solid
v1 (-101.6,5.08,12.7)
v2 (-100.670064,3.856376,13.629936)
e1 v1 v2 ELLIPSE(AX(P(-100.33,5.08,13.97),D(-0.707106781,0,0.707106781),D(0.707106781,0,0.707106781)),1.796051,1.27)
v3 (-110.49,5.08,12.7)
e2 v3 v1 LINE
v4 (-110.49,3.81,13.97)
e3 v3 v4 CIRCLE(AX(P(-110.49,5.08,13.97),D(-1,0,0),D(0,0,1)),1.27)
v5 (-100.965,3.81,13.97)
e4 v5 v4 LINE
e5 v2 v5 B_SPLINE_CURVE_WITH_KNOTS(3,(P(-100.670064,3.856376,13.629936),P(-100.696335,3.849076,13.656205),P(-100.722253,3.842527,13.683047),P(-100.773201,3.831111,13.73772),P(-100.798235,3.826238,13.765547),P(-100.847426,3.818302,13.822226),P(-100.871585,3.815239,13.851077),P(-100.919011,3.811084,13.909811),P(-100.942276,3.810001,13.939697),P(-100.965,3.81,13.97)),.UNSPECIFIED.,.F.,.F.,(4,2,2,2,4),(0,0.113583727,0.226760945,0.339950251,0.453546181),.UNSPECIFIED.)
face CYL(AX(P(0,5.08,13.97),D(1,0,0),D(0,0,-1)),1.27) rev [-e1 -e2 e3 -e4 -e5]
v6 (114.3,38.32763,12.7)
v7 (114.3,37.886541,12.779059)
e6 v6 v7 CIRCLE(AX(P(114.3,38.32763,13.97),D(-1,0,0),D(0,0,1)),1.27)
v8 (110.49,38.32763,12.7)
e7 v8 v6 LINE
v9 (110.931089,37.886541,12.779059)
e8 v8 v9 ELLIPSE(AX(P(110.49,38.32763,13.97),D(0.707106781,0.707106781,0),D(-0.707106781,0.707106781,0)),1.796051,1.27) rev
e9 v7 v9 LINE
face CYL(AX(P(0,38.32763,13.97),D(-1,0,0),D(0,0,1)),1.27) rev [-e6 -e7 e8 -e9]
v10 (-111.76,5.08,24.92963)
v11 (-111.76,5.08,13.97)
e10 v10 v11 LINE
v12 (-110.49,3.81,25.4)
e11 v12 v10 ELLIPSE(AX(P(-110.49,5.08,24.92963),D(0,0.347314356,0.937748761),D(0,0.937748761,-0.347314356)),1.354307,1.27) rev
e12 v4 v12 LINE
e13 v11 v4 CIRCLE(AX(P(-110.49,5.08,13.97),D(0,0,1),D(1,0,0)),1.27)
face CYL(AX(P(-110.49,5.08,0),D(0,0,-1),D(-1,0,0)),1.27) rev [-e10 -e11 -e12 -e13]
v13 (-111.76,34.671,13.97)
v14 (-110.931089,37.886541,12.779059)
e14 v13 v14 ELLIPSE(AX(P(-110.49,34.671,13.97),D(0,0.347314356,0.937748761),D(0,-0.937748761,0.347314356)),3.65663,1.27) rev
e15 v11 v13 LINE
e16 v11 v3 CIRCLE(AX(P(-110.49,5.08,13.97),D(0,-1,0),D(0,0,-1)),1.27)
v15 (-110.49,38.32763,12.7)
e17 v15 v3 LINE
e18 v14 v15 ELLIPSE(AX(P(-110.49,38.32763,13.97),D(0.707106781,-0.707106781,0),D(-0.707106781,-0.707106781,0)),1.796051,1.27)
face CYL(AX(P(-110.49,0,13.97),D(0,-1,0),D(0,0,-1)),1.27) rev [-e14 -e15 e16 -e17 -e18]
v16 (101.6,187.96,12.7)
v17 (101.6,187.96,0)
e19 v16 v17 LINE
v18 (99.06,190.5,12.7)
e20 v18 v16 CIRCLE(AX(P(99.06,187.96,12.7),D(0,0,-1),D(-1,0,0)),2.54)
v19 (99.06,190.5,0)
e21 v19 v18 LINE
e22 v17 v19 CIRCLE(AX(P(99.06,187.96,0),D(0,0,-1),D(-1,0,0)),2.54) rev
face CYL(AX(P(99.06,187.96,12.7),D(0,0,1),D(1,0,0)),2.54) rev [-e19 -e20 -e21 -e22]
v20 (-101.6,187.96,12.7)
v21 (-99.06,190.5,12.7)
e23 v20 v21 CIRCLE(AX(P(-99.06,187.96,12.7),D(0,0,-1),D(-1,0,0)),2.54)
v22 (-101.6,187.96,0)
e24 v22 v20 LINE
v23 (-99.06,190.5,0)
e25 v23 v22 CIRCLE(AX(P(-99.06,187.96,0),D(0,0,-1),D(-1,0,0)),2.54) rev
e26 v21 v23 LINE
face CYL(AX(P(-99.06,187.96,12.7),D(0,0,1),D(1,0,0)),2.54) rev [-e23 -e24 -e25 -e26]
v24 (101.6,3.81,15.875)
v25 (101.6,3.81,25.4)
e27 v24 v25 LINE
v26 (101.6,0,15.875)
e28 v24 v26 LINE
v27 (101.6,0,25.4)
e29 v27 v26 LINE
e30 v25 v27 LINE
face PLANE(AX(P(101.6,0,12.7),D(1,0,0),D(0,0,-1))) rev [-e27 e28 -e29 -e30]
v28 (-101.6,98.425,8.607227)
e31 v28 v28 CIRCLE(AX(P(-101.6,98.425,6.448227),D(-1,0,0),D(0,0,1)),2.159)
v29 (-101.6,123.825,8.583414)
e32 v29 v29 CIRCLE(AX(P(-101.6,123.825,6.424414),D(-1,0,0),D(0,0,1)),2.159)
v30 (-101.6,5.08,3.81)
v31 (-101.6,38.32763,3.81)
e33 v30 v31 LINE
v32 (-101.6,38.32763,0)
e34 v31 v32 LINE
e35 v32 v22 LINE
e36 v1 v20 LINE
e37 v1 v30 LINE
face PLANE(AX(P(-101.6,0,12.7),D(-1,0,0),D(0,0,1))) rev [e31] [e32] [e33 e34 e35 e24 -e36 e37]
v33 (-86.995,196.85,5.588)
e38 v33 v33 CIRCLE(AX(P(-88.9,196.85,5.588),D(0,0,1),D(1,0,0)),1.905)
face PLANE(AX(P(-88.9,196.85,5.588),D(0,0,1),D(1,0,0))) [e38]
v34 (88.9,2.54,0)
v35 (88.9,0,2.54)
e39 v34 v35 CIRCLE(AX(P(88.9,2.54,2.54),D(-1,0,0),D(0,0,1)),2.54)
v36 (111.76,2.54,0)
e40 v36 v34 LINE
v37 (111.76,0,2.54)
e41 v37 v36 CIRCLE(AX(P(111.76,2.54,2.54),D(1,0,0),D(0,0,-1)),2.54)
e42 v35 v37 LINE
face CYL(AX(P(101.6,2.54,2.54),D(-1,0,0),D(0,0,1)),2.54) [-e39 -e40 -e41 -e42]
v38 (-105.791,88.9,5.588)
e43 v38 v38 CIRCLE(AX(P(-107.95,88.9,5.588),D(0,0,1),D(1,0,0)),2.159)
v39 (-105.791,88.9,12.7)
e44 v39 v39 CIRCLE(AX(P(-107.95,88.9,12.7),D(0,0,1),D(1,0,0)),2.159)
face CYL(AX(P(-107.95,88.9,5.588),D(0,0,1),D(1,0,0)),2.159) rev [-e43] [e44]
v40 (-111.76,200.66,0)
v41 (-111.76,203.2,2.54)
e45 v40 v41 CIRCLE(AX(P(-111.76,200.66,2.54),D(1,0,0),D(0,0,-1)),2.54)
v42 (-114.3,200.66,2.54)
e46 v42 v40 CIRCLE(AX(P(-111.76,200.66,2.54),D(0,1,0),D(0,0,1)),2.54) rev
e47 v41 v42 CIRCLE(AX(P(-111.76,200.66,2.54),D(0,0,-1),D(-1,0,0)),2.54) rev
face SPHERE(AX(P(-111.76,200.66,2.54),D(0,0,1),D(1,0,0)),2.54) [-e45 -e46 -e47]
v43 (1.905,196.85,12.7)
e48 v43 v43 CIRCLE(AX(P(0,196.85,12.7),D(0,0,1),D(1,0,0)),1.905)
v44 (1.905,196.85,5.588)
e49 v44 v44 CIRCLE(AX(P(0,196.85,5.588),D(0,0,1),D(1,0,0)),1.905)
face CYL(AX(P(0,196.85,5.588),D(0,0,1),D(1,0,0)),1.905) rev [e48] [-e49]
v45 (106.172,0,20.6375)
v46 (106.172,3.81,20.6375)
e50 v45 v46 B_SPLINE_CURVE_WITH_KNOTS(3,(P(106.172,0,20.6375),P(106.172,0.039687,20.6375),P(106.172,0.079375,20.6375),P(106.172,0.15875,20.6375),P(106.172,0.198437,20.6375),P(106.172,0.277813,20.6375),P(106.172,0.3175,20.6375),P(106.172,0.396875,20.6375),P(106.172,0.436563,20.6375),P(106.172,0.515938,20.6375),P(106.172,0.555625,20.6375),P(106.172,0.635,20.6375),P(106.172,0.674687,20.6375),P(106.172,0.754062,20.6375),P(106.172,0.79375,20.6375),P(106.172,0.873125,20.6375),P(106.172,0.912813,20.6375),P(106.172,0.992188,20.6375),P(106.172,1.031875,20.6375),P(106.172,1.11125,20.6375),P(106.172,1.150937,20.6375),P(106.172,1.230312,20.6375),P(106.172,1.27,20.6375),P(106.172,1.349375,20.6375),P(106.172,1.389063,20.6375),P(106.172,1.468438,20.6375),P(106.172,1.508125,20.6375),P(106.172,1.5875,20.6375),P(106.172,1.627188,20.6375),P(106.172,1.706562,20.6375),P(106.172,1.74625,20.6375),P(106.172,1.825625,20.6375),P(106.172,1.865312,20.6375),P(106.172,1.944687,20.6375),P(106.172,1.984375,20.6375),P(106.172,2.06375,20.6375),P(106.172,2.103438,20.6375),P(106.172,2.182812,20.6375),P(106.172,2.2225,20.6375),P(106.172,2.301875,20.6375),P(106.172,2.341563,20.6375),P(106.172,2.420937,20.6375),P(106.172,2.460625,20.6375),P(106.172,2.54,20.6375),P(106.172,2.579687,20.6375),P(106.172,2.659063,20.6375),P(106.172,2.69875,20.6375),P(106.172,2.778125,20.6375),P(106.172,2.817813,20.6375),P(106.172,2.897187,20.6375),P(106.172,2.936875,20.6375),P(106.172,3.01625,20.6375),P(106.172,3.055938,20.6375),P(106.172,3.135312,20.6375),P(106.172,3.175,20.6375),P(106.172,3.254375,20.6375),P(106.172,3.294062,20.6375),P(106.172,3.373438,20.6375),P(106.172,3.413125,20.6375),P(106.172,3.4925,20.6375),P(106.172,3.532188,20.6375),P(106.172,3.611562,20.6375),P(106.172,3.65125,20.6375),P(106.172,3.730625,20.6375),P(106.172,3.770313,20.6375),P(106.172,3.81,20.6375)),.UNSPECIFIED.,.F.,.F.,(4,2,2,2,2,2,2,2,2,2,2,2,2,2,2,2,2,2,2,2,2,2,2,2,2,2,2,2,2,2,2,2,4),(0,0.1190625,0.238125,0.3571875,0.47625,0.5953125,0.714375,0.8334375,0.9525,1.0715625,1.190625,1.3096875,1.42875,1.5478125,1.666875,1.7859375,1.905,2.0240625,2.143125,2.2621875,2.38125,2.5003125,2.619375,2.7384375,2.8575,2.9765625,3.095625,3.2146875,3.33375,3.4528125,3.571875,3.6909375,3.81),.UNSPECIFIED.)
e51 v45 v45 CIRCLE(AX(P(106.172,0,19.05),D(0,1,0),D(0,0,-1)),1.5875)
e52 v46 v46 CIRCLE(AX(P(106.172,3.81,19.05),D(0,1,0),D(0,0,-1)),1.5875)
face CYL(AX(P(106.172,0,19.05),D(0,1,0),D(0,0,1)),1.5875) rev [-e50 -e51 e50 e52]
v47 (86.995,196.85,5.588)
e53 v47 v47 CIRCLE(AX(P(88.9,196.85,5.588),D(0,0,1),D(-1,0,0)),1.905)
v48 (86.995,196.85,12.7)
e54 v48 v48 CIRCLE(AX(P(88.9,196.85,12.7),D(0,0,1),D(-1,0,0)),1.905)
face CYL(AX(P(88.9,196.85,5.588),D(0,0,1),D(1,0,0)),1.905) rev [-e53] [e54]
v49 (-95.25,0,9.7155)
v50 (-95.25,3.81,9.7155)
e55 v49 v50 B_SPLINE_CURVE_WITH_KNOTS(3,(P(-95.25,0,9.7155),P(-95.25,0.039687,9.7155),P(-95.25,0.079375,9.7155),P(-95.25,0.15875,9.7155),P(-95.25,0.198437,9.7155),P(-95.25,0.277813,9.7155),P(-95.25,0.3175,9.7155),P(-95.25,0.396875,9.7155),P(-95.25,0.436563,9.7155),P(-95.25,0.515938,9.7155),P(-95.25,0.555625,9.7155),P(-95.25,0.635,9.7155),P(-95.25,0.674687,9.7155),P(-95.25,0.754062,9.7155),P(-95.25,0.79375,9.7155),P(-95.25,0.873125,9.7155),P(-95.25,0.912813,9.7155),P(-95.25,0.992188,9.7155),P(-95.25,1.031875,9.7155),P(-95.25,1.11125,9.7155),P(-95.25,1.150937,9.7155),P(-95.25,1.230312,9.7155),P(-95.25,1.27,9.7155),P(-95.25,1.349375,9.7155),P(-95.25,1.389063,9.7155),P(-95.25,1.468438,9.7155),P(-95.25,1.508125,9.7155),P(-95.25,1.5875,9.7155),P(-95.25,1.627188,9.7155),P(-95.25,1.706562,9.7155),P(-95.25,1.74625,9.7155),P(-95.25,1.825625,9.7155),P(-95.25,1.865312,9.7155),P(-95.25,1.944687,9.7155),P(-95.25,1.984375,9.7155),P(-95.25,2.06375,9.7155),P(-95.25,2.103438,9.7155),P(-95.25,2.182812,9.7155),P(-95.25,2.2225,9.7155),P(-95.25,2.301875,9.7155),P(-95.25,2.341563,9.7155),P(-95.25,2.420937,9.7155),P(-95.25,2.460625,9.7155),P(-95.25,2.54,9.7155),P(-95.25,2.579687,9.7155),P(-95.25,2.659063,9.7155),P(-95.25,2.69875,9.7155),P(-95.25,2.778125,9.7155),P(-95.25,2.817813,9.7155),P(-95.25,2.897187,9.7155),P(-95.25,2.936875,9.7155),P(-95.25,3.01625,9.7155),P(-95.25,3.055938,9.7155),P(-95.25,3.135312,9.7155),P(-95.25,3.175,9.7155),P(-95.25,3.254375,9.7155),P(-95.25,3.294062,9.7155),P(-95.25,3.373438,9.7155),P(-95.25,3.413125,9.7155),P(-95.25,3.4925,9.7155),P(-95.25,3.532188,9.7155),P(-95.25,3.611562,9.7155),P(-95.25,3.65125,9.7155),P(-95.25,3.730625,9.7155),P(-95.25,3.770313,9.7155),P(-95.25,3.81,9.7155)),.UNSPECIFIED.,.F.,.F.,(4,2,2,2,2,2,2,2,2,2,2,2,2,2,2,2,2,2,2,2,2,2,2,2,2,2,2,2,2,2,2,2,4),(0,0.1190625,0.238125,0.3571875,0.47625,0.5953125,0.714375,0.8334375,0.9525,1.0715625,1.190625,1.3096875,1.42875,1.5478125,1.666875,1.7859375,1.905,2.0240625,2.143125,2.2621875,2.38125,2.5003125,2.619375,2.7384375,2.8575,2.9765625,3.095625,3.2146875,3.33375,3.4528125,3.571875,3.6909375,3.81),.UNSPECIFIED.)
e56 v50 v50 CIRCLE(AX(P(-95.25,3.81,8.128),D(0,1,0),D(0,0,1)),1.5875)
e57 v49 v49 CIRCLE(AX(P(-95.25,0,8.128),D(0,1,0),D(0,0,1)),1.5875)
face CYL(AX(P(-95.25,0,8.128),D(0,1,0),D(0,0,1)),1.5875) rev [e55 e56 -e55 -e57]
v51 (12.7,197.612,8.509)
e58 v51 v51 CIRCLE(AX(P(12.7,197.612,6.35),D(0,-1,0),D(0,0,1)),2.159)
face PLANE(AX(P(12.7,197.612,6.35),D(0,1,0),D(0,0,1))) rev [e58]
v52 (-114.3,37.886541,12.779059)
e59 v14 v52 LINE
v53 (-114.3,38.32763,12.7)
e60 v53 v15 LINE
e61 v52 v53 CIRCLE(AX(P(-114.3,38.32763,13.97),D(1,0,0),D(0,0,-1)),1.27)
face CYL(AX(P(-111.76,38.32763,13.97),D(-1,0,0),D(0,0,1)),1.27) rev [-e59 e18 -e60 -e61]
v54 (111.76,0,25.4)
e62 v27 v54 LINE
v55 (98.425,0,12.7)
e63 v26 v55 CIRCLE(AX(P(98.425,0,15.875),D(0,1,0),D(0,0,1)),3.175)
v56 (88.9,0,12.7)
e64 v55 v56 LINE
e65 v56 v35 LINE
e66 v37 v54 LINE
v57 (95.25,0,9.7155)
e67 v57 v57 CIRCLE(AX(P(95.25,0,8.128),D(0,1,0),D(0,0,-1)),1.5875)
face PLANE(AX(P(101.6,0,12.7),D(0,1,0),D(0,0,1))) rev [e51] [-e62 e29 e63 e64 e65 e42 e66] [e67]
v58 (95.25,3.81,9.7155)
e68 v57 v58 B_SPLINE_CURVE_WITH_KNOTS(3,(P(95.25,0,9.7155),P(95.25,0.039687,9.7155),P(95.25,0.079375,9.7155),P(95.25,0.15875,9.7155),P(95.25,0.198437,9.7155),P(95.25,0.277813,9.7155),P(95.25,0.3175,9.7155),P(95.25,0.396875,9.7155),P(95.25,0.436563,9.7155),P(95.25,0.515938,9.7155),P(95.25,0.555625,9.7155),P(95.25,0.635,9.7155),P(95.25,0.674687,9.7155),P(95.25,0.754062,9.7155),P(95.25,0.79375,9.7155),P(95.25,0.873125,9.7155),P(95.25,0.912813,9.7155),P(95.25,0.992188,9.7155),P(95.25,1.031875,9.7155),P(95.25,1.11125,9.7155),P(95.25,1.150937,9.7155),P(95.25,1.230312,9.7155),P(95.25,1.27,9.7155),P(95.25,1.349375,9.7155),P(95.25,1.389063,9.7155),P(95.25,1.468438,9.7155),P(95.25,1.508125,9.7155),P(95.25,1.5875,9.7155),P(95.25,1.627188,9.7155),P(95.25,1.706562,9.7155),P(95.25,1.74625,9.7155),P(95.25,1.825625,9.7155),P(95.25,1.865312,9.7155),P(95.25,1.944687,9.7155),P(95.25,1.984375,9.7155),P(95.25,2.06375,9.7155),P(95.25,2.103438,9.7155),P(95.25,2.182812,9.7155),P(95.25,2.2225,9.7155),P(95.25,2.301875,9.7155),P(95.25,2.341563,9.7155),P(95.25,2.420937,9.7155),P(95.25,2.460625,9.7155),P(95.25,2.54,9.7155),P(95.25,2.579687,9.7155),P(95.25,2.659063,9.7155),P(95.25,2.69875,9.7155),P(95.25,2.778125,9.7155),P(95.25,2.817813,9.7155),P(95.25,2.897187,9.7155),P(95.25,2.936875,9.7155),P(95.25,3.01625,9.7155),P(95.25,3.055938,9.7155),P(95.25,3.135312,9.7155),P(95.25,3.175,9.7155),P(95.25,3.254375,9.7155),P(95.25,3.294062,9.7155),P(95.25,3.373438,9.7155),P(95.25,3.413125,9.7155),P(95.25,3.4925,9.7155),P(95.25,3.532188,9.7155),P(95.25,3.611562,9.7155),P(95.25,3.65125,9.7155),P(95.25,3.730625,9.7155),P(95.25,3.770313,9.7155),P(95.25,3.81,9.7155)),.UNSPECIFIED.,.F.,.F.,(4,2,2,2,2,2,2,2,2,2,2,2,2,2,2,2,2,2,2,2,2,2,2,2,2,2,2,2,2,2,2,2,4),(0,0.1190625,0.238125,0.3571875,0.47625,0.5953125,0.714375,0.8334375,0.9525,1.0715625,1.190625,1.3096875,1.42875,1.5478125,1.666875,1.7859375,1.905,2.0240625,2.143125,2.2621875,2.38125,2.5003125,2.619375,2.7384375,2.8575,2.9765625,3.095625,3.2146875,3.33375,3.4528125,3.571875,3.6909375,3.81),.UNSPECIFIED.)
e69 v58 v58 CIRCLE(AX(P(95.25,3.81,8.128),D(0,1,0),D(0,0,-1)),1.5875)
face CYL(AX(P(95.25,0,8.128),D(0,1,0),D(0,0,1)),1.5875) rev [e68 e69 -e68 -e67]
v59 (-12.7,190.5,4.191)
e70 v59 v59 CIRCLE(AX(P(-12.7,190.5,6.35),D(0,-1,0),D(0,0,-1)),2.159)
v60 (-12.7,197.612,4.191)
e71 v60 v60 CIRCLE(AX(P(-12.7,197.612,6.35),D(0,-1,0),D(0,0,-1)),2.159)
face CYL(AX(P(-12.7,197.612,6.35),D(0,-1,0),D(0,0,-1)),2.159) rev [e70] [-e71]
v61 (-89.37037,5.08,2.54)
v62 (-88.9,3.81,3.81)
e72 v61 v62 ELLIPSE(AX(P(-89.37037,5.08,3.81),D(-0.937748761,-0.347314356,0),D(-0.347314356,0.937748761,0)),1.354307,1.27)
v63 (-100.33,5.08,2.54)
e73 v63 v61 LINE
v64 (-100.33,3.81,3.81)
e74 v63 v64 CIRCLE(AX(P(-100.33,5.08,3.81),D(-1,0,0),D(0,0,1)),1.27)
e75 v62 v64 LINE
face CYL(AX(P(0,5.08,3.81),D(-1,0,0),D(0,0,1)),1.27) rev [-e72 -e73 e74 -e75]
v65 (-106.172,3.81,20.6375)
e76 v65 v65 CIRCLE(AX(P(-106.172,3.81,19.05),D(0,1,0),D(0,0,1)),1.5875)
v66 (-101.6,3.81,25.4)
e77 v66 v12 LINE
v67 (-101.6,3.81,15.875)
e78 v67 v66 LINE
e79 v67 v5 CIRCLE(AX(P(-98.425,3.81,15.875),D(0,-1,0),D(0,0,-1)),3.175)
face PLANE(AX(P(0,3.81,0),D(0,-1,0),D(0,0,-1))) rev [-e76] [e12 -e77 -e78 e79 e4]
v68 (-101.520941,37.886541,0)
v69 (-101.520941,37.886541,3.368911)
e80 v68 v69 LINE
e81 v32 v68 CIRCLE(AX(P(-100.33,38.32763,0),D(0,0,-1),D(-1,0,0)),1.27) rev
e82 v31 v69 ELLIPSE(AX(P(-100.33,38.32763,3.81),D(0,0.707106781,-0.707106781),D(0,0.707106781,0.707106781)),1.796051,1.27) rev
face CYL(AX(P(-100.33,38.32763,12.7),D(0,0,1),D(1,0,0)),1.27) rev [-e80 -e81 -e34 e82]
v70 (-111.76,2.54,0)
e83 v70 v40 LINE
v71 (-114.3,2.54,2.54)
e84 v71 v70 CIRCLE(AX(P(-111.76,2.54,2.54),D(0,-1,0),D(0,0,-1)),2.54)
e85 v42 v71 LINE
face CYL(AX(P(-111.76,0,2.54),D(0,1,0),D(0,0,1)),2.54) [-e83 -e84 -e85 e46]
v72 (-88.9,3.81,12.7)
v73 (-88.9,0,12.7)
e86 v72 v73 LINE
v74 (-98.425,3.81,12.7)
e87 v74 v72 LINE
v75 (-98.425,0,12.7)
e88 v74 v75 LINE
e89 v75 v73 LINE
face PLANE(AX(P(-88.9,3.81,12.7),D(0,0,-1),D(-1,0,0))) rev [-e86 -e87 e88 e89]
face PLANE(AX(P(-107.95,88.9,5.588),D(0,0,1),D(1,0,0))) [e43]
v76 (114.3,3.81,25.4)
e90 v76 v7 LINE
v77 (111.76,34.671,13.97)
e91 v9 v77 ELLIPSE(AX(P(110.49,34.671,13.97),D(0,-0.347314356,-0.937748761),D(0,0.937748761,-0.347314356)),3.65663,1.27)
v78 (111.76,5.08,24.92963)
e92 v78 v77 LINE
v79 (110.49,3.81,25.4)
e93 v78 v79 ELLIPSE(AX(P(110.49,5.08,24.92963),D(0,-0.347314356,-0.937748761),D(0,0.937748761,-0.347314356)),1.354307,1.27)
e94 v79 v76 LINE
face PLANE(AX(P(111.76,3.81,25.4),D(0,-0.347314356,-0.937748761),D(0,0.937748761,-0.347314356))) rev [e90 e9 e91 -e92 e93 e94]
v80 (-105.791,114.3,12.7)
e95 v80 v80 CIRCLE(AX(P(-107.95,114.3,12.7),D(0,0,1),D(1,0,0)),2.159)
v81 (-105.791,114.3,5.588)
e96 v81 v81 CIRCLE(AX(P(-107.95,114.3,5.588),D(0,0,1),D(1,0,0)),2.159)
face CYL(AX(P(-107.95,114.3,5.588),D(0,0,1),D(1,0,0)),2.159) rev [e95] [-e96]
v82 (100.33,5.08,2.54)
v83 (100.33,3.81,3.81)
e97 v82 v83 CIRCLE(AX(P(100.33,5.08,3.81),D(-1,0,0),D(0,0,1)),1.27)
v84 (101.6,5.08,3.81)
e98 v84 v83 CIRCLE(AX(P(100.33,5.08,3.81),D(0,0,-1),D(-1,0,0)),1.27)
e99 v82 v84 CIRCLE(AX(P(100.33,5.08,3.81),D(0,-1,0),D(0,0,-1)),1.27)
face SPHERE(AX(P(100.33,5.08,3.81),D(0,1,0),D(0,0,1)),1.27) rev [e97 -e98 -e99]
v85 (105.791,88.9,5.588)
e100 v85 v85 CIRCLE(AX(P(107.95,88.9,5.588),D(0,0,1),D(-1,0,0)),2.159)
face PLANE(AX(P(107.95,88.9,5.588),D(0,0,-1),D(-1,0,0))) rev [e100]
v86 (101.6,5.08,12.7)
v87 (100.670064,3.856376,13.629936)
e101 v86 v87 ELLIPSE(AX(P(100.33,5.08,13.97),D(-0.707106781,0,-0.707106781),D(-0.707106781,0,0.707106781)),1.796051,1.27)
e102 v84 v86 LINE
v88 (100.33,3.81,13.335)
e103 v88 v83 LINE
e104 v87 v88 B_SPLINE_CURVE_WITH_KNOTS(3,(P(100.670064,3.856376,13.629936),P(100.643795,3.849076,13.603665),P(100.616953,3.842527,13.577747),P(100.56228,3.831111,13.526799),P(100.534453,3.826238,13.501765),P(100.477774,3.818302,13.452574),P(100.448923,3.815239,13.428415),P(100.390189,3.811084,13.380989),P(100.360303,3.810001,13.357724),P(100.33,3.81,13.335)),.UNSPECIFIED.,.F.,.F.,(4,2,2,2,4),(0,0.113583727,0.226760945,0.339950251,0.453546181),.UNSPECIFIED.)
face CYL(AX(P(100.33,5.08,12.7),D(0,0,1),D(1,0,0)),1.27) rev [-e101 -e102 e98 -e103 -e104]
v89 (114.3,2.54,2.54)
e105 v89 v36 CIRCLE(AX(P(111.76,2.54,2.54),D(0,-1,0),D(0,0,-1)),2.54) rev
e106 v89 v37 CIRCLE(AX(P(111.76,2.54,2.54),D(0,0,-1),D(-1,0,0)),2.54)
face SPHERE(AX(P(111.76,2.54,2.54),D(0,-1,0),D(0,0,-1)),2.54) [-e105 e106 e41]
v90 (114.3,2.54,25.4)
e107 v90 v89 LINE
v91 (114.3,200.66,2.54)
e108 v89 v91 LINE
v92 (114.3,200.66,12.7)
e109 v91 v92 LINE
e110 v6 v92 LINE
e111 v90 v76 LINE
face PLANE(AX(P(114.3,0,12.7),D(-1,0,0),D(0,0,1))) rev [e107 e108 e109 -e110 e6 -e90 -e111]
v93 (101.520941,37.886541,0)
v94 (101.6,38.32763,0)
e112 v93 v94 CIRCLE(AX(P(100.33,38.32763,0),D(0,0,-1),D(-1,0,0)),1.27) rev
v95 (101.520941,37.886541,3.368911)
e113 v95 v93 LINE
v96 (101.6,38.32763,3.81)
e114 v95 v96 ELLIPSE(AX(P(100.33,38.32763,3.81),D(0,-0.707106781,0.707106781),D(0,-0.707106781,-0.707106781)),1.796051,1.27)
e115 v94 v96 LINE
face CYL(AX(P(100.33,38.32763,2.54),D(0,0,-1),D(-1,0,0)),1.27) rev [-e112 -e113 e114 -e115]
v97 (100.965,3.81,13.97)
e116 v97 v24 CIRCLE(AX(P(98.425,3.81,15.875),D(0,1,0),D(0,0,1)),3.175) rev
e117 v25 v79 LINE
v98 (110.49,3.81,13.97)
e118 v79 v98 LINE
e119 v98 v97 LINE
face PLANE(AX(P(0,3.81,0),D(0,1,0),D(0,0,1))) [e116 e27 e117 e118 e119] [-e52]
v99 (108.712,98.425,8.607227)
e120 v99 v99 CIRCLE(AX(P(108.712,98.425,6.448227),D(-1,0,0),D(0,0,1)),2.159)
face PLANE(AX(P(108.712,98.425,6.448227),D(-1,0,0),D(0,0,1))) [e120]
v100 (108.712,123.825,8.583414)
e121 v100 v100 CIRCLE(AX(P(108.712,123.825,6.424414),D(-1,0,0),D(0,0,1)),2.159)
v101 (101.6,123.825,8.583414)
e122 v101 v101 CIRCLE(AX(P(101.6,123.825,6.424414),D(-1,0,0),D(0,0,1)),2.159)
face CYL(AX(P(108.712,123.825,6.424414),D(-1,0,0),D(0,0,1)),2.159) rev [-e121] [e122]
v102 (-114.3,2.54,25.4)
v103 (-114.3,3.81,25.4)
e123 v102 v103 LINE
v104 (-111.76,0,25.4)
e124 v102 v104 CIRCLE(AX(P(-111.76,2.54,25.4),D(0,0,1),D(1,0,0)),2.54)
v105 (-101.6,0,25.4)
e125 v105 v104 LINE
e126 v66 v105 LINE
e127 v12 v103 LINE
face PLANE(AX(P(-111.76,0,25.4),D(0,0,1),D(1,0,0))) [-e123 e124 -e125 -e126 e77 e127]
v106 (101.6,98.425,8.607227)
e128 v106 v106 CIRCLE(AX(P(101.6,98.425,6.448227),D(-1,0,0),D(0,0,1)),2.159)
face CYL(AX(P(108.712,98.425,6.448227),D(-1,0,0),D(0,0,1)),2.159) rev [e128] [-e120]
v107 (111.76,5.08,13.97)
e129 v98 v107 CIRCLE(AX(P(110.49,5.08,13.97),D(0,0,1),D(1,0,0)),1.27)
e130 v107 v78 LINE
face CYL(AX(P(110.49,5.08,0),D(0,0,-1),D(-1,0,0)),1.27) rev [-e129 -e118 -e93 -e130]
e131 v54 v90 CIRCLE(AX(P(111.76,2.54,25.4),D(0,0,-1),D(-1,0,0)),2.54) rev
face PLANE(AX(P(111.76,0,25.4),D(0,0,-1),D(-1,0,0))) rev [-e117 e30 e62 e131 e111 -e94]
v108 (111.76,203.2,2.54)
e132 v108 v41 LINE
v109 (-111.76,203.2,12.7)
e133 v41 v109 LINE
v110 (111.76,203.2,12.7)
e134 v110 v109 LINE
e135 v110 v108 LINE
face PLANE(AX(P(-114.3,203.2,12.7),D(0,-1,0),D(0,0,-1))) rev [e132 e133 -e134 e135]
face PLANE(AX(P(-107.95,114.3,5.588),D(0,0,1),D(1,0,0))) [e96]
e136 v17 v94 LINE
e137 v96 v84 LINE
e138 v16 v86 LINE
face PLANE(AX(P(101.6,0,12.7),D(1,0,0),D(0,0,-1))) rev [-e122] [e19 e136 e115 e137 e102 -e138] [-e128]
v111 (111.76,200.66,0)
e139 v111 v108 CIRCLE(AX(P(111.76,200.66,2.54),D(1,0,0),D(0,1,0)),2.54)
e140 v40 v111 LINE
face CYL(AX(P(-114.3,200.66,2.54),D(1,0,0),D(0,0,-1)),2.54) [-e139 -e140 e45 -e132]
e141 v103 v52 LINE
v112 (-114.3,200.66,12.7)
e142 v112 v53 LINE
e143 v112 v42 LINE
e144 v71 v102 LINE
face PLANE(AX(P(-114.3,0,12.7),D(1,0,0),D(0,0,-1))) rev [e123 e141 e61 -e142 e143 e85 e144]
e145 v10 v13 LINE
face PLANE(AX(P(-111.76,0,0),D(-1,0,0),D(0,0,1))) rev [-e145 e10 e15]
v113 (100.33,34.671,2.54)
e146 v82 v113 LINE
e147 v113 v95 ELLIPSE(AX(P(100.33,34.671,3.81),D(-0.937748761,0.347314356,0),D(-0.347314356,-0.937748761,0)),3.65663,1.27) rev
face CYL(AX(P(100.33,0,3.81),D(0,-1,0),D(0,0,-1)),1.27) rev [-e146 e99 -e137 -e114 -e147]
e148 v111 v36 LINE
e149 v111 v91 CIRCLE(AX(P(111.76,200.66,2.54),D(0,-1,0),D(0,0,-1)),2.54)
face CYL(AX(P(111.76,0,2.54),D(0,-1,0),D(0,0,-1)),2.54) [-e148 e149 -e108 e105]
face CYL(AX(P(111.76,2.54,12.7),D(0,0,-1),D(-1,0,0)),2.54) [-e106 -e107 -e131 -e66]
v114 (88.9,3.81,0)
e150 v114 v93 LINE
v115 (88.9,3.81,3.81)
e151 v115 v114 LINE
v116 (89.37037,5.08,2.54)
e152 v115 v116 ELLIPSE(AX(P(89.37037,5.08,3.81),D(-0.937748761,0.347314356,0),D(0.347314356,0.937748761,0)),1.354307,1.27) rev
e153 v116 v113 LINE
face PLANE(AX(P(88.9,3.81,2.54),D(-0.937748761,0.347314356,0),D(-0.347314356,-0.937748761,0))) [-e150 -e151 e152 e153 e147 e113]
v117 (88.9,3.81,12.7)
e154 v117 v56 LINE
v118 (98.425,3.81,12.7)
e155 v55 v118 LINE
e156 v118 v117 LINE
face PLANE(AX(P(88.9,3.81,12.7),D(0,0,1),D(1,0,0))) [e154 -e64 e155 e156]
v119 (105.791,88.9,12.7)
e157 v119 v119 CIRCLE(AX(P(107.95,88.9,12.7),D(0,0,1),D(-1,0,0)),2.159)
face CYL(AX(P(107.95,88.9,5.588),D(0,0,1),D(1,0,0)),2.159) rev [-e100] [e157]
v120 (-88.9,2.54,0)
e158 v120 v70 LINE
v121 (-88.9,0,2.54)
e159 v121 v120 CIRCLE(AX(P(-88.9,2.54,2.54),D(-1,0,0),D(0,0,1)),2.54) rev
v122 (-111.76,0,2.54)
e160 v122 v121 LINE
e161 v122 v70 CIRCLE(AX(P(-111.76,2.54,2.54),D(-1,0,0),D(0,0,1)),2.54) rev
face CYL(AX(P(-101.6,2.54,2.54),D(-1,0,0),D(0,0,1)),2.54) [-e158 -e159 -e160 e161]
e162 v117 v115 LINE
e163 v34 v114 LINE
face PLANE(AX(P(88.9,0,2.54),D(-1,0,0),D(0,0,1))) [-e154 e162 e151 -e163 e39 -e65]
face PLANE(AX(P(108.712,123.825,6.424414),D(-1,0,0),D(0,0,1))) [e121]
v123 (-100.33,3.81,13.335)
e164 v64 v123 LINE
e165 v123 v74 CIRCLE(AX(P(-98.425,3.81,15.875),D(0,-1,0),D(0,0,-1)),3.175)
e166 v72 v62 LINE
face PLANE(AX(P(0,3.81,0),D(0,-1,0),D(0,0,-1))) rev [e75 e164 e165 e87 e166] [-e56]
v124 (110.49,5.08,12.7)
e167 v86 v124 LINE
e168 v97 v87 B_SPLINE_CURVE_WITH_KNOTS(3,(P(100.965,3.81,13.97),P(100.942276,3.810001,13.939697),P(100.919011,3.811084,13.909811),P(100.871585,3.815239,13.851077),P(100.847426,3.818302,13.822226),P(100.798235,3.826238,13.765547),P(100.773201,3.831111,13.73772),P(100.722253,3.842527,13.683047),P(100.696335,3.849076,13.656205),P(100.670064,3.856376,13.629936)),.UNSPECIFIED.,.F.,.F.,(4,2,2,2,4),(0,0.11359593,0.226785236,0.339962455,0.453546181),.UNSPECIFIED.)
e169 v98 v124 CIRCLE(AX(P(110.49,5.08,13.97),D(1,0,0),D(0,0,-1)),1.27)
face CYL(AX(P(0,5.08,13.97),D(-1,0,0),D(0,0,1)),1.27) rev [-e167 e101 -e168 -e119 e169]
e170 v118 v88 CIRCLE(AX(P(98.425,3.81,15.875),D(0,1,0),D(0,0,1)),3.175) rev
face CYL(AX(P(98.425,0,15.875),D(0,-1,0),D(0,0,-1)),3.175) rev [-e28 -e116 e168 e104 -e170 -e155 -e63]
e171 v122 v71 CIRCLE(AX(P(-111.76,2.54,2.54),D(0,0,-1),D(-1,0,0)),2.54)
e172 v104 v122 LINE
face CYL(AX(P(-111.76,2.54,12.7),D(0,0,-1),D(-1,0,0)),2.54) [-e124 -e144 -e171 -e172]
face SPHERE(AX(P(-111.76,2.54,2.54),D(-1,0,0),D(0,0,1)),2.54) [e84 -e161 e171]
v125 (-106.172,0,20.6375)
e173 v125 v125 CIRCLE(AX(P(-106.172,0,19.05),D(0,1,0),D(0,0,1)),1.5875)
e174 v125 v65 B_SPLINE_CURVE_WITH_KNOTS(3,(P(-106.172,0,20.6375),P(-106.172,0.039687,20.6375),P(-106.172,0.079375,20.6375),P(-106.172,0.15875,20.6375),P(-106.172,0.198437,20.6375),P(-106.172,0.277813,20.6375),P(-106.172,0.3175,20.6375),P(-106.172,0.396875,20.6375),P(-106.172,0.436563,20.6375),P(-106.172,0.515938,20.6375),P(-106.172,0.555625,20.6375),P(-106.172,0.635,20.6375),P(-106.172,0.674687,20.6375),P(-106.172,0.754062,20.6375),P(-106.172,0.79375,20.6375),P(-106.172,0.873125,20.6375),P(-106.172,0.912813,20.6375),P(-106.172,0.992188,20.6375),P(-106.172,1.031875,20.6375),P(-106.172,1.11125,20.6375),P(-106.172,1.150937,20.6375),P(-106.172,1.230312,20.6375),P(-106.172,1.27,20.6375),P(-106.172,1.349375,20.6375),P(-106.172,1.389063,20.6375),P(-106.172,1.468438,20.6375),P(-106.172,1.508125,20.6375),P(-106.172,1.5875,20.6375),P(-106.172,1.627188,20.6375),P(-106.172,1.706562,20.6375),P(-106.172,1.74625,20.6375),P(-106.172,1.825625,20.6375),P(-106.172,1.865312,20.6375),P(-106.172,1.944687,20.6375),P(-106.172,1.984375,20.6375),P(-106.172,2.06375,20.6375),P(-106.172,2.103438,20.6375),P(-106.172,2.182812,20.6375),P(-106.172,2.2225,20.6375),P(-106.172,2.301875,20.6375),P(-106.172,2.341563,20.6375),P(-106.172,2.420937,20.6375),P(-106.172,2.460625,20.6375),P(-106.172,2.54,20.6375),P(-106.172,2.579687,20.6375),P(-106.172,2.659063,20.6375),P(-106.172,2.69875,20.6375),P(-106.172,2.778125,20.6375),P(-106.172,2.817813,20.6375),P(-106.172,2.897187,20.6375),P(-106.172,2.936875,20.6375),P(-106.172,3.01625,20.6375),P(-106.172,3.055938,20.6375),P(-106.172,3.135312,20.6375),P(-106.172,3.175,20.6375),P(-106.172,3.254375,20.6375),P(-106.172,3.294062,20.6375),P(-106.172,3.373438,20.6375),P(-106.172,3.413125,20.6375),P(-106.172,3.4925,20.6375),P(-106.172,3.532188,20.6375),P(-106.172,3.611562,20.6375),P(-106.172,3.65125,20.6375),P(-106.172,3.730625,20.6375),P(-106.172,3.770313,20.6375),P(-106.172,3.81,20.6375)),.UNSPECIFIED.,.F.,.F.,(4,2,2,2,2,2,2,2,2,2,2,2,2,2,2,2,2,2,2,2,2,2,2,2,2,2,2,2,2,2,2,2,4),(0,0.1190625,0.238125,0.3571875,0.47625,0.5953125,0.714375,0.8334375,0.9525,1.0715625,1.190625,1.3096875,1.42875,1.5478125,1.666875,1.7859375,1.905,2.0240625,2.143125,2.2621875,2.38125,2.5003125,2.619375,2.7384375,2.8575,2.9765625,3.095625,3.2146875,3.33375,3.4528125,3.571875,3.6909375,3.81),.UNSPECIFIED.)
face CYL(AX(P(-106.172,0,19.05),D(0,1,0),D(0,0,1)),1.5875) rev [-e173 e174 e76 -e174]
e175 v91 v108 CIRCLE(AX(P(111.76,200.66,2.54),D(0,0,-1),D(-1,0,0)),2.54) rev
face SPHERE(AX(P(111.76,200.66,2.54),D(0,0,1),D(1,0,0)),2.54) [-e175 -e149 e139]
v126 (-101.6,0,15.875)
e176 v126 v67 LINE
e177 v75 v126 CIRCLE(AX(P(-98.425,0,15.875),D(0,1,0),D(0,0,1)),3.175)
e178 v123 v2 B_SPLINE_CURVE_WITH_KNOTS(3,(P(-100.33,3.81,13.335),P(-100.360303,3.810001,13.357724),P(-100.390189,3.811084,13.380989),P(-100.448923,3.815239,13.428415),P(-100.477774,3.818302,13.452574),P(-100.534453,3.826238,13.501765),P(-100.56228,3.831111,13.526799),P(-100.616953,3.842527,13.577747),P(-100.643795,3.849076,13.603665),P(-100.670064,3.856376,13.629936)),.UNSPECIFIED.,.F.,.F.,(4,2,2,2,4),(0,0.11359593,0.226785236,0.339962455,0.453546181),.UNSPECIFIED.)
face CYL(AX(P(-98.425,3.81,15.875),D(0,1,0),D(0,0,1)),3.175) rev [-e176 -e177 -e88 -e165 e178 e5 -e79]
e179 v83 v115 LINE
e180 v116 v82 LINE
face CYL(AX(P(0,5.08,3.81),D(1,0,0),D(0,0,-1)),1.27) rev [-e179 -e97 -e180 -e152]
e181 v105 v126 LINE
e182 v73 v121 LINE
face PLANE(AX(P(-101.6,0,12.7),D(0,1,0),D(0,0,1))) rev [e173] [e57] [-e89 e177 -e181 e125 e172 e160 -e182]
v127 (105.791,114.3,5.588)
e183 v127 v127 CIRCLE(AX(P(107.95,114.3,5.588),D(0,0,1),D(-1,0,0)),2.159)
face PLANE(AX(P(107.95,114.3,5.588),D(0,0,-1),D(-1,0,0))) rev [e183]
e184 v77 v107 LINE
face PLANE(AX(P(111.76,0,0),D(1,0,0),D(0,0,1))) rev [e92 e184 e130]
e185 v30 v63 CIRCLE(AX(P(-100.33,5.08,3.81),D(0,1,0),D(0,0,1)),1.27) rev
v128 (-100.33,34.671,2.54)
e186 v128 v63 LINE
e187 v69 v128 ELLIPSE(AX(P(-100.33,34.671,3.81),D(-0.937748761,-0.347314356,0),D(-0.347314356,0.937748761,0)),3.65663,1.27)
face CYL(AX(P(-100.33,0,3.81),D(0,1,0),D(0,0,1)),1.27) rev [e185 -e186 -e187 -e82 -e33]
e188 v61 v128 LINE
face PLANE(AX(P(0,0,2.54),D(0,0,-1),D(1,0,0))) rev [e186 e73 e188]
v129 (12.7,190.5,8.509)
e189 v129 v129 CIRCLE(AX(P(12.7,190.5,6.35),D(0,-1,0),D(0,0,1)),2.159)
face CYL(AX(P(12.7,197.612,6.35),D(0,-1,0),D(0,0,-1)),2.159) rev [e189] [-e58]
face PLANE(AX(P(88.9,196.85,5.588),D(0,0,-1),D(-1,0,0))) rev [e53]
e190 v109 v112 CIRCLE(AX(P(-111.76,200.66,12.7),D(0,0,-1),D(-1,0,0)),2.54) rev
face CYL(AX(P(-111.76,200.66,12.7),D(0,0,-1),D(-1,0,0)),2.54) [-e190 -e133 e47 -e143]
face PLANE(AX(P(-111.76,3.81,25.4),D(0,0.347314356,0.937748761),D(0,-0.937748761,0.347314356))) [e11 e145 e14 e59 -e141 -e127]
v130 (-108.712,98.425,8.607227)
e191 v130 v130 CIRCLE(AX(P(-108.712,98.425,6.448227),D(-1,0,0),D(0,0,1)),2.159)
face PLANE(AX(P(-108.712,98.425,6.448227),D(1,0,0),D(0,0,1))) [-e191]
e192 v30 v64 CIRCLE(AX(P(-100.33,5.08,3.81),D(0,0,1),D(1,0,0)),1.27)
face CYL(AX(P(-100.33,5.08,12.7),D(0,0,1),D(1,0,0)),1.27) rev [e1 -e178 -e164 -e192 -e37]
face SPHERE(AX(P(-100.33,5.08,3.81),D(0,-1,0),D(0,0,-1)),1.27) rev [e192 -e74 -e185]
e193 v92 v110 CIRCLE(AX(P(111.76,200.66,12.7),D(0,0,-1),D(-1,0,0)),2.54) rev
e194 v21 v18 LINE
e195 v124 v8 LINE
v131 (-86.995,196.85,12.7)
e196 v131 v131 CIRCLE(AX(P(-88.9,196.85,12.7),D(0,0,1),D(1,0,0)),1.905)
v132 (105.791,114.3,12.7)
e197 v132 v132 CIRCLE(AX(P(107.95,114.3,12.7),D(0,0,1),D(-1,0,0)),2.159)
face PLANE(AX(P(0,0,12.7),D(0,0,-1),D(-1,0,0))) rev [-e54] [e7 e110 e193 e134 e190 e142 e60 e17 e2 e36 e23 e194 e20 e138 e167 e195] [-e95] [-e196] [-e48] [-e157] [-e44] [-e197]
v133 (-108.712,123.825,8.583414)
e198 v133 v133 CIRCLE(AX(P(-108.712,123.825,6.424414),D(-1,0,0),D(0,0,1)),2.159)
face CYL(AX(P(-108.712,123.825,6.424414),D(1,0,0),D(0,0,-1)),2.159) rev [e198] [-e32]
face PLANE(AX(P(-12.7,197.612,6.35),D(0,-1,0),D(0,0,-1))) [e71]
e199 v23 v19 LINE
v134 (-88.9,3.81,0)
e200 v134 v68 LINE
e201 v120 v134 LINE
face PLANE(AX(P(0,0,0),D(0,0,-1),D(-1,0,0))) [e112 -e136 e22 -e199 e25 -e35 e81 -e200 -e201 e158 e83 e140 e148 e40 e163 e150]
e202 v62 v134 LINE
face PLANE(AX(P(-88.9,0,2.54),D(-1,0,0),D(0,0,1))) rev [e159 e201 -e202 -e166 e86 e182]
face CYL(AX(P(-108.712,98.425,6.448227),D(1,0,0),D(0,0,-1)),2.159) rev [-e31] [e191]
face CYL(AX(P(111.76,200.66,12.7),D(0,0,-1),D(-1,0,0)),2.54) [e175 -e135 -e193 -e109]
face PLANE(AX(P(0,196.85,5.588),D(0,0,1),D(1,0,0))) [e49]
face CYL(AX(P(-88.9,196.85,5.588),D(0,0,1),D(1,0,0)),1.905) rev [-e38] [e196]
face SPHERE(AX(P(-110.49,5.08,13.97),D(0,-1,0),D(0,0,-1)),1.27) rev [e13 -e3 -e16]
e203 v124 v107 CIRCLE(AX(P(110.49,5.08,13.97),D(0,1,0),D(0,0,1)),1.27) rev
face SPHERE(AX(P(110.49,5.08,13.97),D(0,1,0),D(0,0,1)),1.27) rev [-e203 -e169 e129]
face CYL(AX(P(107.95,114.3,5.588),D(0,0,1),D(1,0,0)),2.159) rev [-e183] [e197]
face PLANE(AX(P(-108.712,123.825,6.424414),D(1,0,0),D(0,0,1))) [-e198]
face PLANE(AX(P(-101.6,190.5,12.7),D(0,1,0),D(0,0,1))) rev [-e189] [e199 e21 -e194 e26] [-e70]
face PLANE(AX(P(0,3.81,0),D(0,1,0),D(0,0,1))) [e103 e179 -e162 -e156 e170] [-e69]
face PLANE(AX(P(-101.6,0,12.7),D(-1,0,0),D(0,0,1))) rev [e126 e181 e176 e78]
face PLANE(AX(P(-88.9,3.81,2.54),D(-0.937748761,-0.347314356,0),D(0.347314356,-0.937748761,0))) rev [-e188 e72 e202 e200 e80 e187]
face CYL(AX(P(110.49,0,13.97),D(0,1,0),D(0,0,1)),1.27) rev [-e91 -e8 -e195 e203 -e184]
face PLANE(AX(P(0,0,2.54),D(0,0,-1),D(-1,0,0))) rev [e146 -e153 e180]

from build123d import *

# Parameters (mm, degrees)
FRAME_DEPTH                 = 12.7
GUSSET_SIDE_DEPTH           = 2.54
SKETCH4_W                   = 12.7
SKETCH4_H                   = 25.4
BOTTOM_MOUNT_PLATE_DEPTH    = 3.81
GUSSET_FRONT_DEPTH          = 2.54
SKETCH6_W                   = 25.4
SKETCH6_H                   = 12.7
BOTTOM_MOUNT_PLATE2_DEPTH   = 3.81
FILLET1_R                   = 1.27
FILLET2_R                   = 3.175
FILLET4_R                   = 1.27
SKETCH7_R                   = 1.5875
BOTTOM_MOUNTING_HOLES_DEPTH = 232.227208823
SKETCH8_R                   = 1.905
TOP_MOUNTINGHOLES_DEPTH     = 7.112
SKETCH9_R                   = 2.159
BRACE_MOUNTING_HOLES_DEPTH  = 7.112
SKETCH10_R                  = 2.159
CUT_EXTRUDE1_DEPTH          = 7.112
FILLET5_R                   = 2.54
FILLET6_R                   = 2.54
SKETCH11_R                  = 2.159
CUT_EXTRUDE2_DEPTH          = 7.112


with BuildPart() as part:
    # Sketch1 → Frame (new body)
    with BuildSketch(Plane.XY):
        Polygon((-101.6, 0), (-101.6, 190.5), (101.6, 190.5), (101.6, 0), (114.3, 0), (114.3, 203.2), (-114.3, 203.2), (-114.3, 0), align=None)
    extrude(amount=FRAME_DEPTH)

    # Sketch3 → gusset_side (add)
    with BuildSketch(Plane.ZY.offset(114.3)):
        Polygon((0, 0), (25.4, 0), (25.4, 3.81), (12.7, 38.1), (0, 38.1), align=None)
    gusset_side = extrude(amount=-GUSSET_SIDE_DEPTH)

    # gusset_mirror: gusset_side across plane
    add(gusset_side.mirror(Plane(origin=(0, 0, 0), x_dir=(0, 0, 1), z_dir=(1, 0, 0))))

    # Sketch4 → bottom_mount_plate (add)
    with BuildSketch(Plane(origin=(0, 0, 0), x_dir=(-1, 0, 0), z_dir=(0, -1, 0))):
        with Locations((107.95, -12.7)):
            Rectangle(SKETCH4_W, SKETCH4_H)
    bottom_mount_plate = extrude(amount=-BOTTOM_MOUNT_PLATE_DEPTH)

    # Mirror2: bottom_mount_plate across plane
    add(bottom_mount_plate.mirror(Plane(origin=(0, 0, 0), x_dir=(0, 0, 1), z_dir=(1, 0, 0))))

    # Sketch5 → gusset_front (add)
    with BuildSketch(Plane(origin=(0, 0, 0), x_dir=(-1, 0, 0), z_dir=(0, 0, -1))):
        Polygon((-114.3, 0), (-88.9, 0), (-88.9, 3.81), (-101.6, 38.1), (-114.3, 38.1), align=None)
    gusset_front = extrude(amount=-GUSSET_FRONT_DEPTH)

    # Mirror3: gusset_front across plane
    add(gusset_front.mirror(Plane(origin=(0, 0, 0), x_dir=(0, 0, 1), z_dir=(1, 0, 0))))

    # Sketch6 → bottom_mount_plate2 (add)
    with BuildSketch(Plane.XZ):
        with Locations((101.6, 6.35)):
            Rectangle(SKETCH6_W, SKETCH6_H)
    bottom_mount_plate2 = extrude(amount=-BOTTOM_MOUNT_PLATE2_DEPTH)

    # Mirror4: bottom_mount_plate2 across plane
    add(bottom_mount_plate2.mirror(Plane(origin=(0, 0, 0), x_dir=(0, 0, 1), z_dir=(1, 0, 0))))

    # Fillet1
    fillet1_edges = [part.edges().sort_by_distance(p)[0] for p in [
        (101.6, 38.1, 1.27),
        (-101.6, 20.955, 2.54),
        (-101.6, 38.1, 1.27),
        (101.6, 20.955, 2.54),
        (-113.03, 38.1, 12.7),
        (111.76, 20.955, 12.7),
        (113.03, 38.1, 12.7),
        (-111.76, 20.955, 12.7),
    ]]
    fillet(fillet1_edges, radius=FILLET1_R)

    # Fillet2
    # the kernel refuses this fillet: 3.175 mm, written as the material it adds along each edge
    with BuildSketch(Plane(origin=(101.6, 0, 12.7), x_dir=(-1, 0, 0), z_dir=(0, 1, 0))) as fillet2_piece_1:
        with BuildLine():
            CenterArc((FILLET2_R, FILLET2_R), FILLET2_R, 180, 90)
            Line((0, FILLET2_R), (0, 0))
            Line((0, 0), (FILLET2_R, 0))
        make_face()
    extrude(amount=3.81)
    with BuildSketch(Plane(origin=(-101.6, 0, 12.7), x_dir=(1, 0, 0), z_dir=(0, 1, 0))) as fillet2_piece_2:
        with BuildLine():
            CenterArc((FILLET2_R, -FILLET2_R), FILLET2_R, 90, 90)
            Line((0, -FILLET2_R), (0, 0))
            Line((0, 0), (FILLET2_R, 0))
        make_face()
    extrude(amount=3.81)

    # Fillet4
    # the kernel refuses this fillet: 1.27 mm, written as the material it adds along each edge
    with BuildSketch(Plane(origin=(88.9, 3.81, 2.54), x_dir=(0, 0, 1), z_dir=(1, 0, 0))) as fillet4_piece_1_section:
        with BuildLine():
            CenterArc((FILLET4_R, -FILLET4_R), FILLET4_R, 90, 90)
            Line((0, -FILLET4_R), (0, 0))
            Line((0, 0), (FILLET4_R, 0))
        make_face()
    fillet4_piece_1 = extrude(amount=11.43, mode=Mode.PRIVATE)
    fillet4_piece_1 = split(fillet4_piece_1, bisect_by=Plane(origin=(89.688624657, 5.939286574, 2.828959193), z_dir=(0.9377487607237037, -0.3473143558235941, 0)), keep=Keep.TOP, mode=Mode.PRIVATE)
    add(fillet4_piece_1)
    with BuildSketch(Plane(origin=(-101.6, 3.81, 3.81), x_dir=(1, 0, 0), z_dir=(0, 0, 1)), Plane(origin=(101.6, 3.81, 3.81), x_dir=(0, 1, 0), z_dir=(0, 0, 1))) as fillet4_piece_2:
        with BuildLine():
            CenterArc((FILLET4_R, FILLET4_R), FILLET4_R, 180, 90)
            Line((0, FILLET4_R), (0, 0))
            Line((0, 0), (FILLET4_R, 0))
        make_face()
    extrude(amount=8.89)
    with BuildSketch(Plane(origin=(110.49, 3.81, 12.7), x_dir=(0, 1, 0), z_dir=(-1, 0, 0)), Plane(origin=(-110.49, 3.81, 12.7), x_dir=(0, 0, 1), z_dir=(1, 0, 0))) as fillet4_piece_3:
        with BuildLine():
            CenterArc((FILLET4_R, -FILLET4_R), FILLET4_R, 90, 90)
            Line((0, -FILLET4_R), (0, 0))
            Line((0, 0), (FILLET4_R, 0))
        make_face()
    extrude(amount=8.89)
    with BuildSketch(Plane(origin=(100.33, 3.81, 3.81), x_dir=(0, 0, -1), z_dir=(-1, 0, 0))) as fillet4_piece_4:
        with BuildLine():
            CenterArc((1.27 - FILLET4_R, -FILLET4_R), FILLET4_R, 0, 90)
            Line((1.27, -FILLET4_R), (1.27, 0))
            Line((1.27, 0), (1.27 - FILLET4_R, 0))
        make_face()
    revolve(axis=Axis((100.33, 3.81, 3.81), (0, -1, 0)), revolution_arc=90)
    with BuildSketch(Plane(origin=(110.49, 3.81, 13.97), x_dir=(0, 0, -1), z_dir=(-1, 0, 0))) as fillet4_piece_5:
        with BuildLine():
            CenterArc((1.27 - FILLET4_R, -FILLET4_R), FILLET4_R, 0, 90)
            Line((1.27 - FILLET4_R, 0), (1.27, 0))
            Line((1.27, 0), (1.27, -FILLET4_R))
        make_face()
    revolve(axis=Axis((110.49, 3.81, 13.97), (0, -1, 0)), revolution_arc=90)
    with BuildSketch(Plane(origin=(-100.33, 3.81, 2.54), x_dir=(0, 0, 1), z_dir=(1, 0, 0))) as fillet4_piece_6_section:
        with BuildLine():
            CenterArc((FILLET4_R, -FILLET4_R), FILLET4_R, 90, 90)
            Line((0, -FILLET4_R), (0, 0))
            Line((0, 0), (FILLET4_R, 0))
        make_face()
    fillet4_piece_6 = extrude(amount=11.43, mode=Mode.PRIVATE)
    fillet4_piece_6 = split(fillet4_piece_6, bisect_by=Plane(origin=(-89.688624657, 5.939286574, 2.828959193), z_dir=(-0.9377487607237037, -0.3473143558235941, 0)), keep=Keep.TOP, mode=Mode.PRIVATE)
    add(fillet4_piece_6)
    with BuildSketch(Plane(origin=(-100.33, 3.81, 3.81), x_dir=(0, 0, -1), z_dir=(1, 0, 0))) as fillet4_piece_7:
        with BuildLine():
            CenterArc((1.27 - FILLET4_R, FILLET4_R), FILLET4_R, 270, 90)
            Line((1.27, FILLET4_R), (1.27, 0))
            Line((1.27, 0), (1.27 - FILLET4_R, 0))
        make_face()
    revolve(axis=Axis((-100.33, 3.81, 3.81), (0, 1, 0)), revolution_arc=90)
    with BuildSketch(Plane(origin=(-111.76, 3.81, 13.97), x_dir=(1, 0, 0), z_dir=(0, 0, 1))) as fillet4_piece_8_section:
        with BuildLine():
            CenterArc((FILLET4_R, FILLET4_R), FILLET4_R, 180, 90)
            Line((0, FILLET4_R), (0, 0))
            Line((0, 0), (FILLET4_R, 0))
        make_face()
    fillet4_piece_8 = extrude(amount=11.43, mode=Mode.PRIVATE)
    fillet4_piece_8 = split(fillet4_piece_8, bisect_by=Plane(origin=(-111.471040807, 5.939286574, 24.611375343), z_dir=(0, -0.34731435582359405, -0.9377487607237037)), keep=Keep.TOP, mode=Mode.PRIVATE)
    add(fillet4_piece_8)
    with BuildSketch(Plane(origin=(-110.49, 3.81, 13.97), x_dir=(0, 0, -1), z_dir=(1, 0, 0))) as fillet4_piece_9:
        with BuildLine():
            CenterArc((1.27 - FILLET4_R, FILLET4_R), FILLET4_R, 270, 90)
            Line((1.27, FILLET4_R), (1.27, 0))
            Line((1.27, 0), (1.27 - FILLET4_R, 0))
        make_face()
    revolve(axis=Axis((-110.49, 3.81, 13.97), (0, 1, 0)), revolution_arc=90)
    with BuildSketch(Plane(origin=(111.76, 3.81, 25.4), x_dir=(-1, 0, 0), z_dir=(0, 0, -1))) as fillet4_piece_10_section:
        with BuildLine():
            CenterArc((FILLET4_R, FILLET4_R), FILLET4_R, 180, 90)
            Line((0, FILLET4_R), (0, 0))
            Line((0, 0), (FILLET4_R, 0))
        make_face()
    fillet4_piece_10 = extrude(amount=11.43, mode=Mode.PRIVATE)
    fillet4_piece_10 = split(fillet4_piece_10, bisect_by=Plane(origin=(111.471040807, 5.939286574, 24.611375343), z_dir=(0, -0.34731435582359405, -0.9377487607237037)), keep=Keep.TOP, mode=Mode.PRIVATE)
    add(fillet4_piece_10)
    with BuildSketch(Plane(origin=(-110.49, 3.81, 12.7), x_dir=(0, 0, 1), z_dir=(1, 0, 0))) as fillet4_piece_11a_section:
        with BuildLine():
            CenterArc((FILLET4_R, -FILLET4_R), FILLET4_R, 90, 90)
            Line((0, -FILLET4_R), (0, 0))
            Line((0, 0), (FILLET4_R, 0))
        make_face()
    fillet4_piece_11a = extrude(amount=12.065, mode=Mode.PRIVATE)
    fillet4_piece_11a = fillet4_piece_11a - Plane(origin=(-98.425, 4.1527608, 15.875), x_dir=(1, 0, 0), z_dir=(0, -1, 0)) * Cylinder(3.175, 30, mode=Mode.PRIVATE)
    fillet4_piece_11a = split(fillet4_piece_11a, bisect_by=Plane(origin=(-101.6, 4.1527608, 12.907303318), z_dir=(1, 0, 0)), keep=Keep.TOP, mode=Mode.PRIVATE)
    with BuildSketch(Plane(origin=(-101.6, 3.81, 3.81), x_dir=(1, 0, 0), z_dir=(0, 0, 1))) as fillet4_piece_11b_section:
        with BuildLine():
            CenterArc((FILLET4_R, FILLET4_R), FILLET4_R, 180, 90)
            Line((0, FILLET4_R), (0, 0))
            Line((0, 0), (FILLET4_R, 0))
        make_face()
    fillet4_piece_11b = extrude(amount=12.065, mode=Mode.PRIVATE)
    fillet4_piece_11b = fillet4_piece_11b - Plane(origin=(-98.425, 4.152760851, 15.875), x_dir=(1, 0, 0), z_dir=(0, -1, 0)) * Cylinder(3.175, 30, mode=Mode.PRIVATE)
    fillet4_piece_11b = split(fillet4_piece_11b, bisect_by=Plane(origin=(-101.392696671, 4.152760851, 12.7), z_dir=(0, 0, 1)), keep=Keep.TOP, mode=Mode.PRIVATE)
    fillet4_piece_11 = fillet4_piece_11a & fillet4_piece_11b
    add(fillet4_piece_11)
    with BuildSketch(Plane(origin=(110.49, 3.81, 12.7), x_dir=(0, 1, 0), z_dir=(-1, 0, 0))) as fillet4_piece_12a_section:
        with BuildLine():
            CenterArc((FILLET4_R, -FILLET4_R), FILLET4_R, 90, 90)
            Line((0, -FILLET4_R), (0, 0))
            Line((0, 0), (FILLET4_R, 0))
        make_face()
    fillet4_piece_12a = extrude(amount=12.065, mode=Mode.PRIVATE)
    fillet4_piece_12a = split(fillet4_piece_12a, bisect_by=Plane(origin=(101.6, 4.15276082, 12.907303262), z_dir=(-1, 0, 0)), keep=Keep.TOP, mode=Mode.PRIVATE)
    fillet4_piece_12a = fillet4_piece_12a - Plane(origin=(98.425, 4.15276082, 15.875), x_dir=(-1, 0, 0), z_dir=(0, -1, 0)) * Cylinder(3.175, 30, mode=Mode.PRIVATE)
    with BuildSketch(Plane(origin=(101.6, 3.81, 3.81), x_dir=(0, 1, 0), z_dir=(0, 0, 1))) as fillet4_piece_12b_section:
        with BuildLine():
            CenterArc((FILLET4_R, FILLET4_R), FILLET4_R, 180, 90)
            Line((0, FILLET4_R), (0, 0))
            Line((0, 0), (FILLET4_R, 0))
        make_face()
    fillet4_piece_12b = extrude(amount=12.065, mode=Mode.PRIVATE)
    fillet4_piece_12b = split(fillet4_piece_12b, bisect_by=Plane(origin=(101.392696709, 4.15276098, 12.7), z_dir=(0, 0, 1)), keep=Keep.TOP, mode=Mode.PRIVATE)
    fillet4_piece_12b = fillet4_piece_12b - Plane(origin=(98.425, 4.15276098, 15.875), x_dir=(-1, 0, 0), z_dir=(0, -1, 0)) * Cylinder(3.175, 30, mode=Mode.PRIVATE)
    fillet4_piece_12 = fillet4_piece_12a & fillet4_piece_12b
    add(fillet4_piece_12)

    # Sketch7 → Bottom-Mounting-Holes (cut, through all)
    with BuildSketch(Plane(origin=(0, 3.81, 0), x_dir=(1, 0, 0), z_dir=(0, 1, 0))):
        with Locations(Location((-106.172, -19.05, 0), (0, 0, 270))):
            Circle(SKETCH7_R)
        with Locations(Location((-95.25, -8.128, 0), (0, 0, 270))):
            Circle(SKETCH7_R)
        with Locations(Location((95.25, -8.128, 0), (0, 0, 270))):
            Circle(SKETCH7_R)
        with Locations(Location((106.172, -19.05, 0), (0, 0, 270))):
            Circle(SKETCH7_R)
    extrude(amount=-BOTTOM_MOUNTING_HOLES_DEPTH, mode=Mode.SUBTRACT)

    # Sketch8 → Top-MountingHoles (cut)
    with BuildSketch(Plane.XY.offset(12.7)):
        with Locations((0, 196.85)):
            Circle(SKETCH8_R)
        with Locations((-88.9, 196.85)):
            Circle(SKETCH8_R)
        with Locations(Location((88.9, 196.85, 0), (0, 0, 180))):
            Circle(SKETCH8_R)
    extrude(amount=-TOP_MOUNTINGHOLES_DEPTH, mode=Mode.SUBTRACT)

    # Sketch9 → Brace-Mounting-Holes (cut)
    with BuildSketch(Plane.ZY.offset(-101.6)):
        with Locations((6.424414063, 123.825)):
            Circle(SKETCH9_R)
        with Locations((6.448226563, 98.425)):
            Circle(SKETCH9_R)
    brace_mounting_holes = extrude(amount=-BRACE_MOUNTING_HOLES_DEPTH, mode=Mode.SUBTRACT)

    # Mirror5: Brace-Mounting-Holes across plane
    add(brace_mounting_holes.mirror(Plane(origin=(0, 0, 0), x_dir=(0, 0, 1), z_dir=(1, 0, 0))), mode=Mode.SUBTRACT)

    # Sketch10 → Cut-Extrude1 (cut)
    with BuildSketch(Plane.XY.offset(12.7)):
        with Locations((-107.95, 114.3)):
            Circle(SKETCH10_R)
        with Locations((-107.95, 88.9)):
            Circle(SKETCH10_R)
        with Locations(Location((107.95, 88.9, 0), (0, 0, 180))):
            Circle(SKETCH10_R)
        with Locations(Location((107.95, 114.3, 0), (0, 0, 180))):
            Circle(SKETCH10_R)
    extrude(amount=-CUT_EXTRUDE1_DEPTH, mode=Mode.SUBTRACT)

    # Fillet5
    fillet5_edges = [part.edges().sort_by_distance(p)[0] for p in [
        (-101.6, 0, 0),
        (-114.3, 0, 12.7),
        (-114.3, 203.2, 6.35),
        (114.3, 203.2, 6.35),
        (114.3, 0, 12.7),
        (-114.3, 101.6, 0),
        (114.3, 101.6, 0),
        (101.6, 0, 0),
    ]]
    fillet(fillet5_edges, radius=FILLET5_R)

    # Fillet6
    # the kernel refuses this fillet: 2.54 mm, written as the material it adds along each edge
    with BuildSketch(Plane(origin=(101.6, 190.5, 0), x_dir=(-1, 0, 0), z_dir=(0, 0, 1)), Plane(origin=(-101.6, 190.5, 0), x_dir=(0, -1, 0), z_dir=(0, 0, 1))) as fillet6_piece_1:
        with BuildLine():
            CenterArc((FILLET6_R, FILLET6_R), FILLET6_R, 180, 90)
            Line((0, FILLET6_R), (0, 0))
            Line((0, 0), (FILLET6_R, 0))
        make_face()
    extrude(amount=12.7)
    # the kernel refuses this fillet: 2.54 mm, written as the material it takes off along each edge
    with BuildSketch(Plane(origin=(-111.76, 200.66, 2.54), x_dir=(0, 0, -1), z_dir=(0, 1, 0))) as fillet6_2_piece_1_section:
        Polygon((0, 0), (FILLET6_R, 0), (FILLET6_R, FILLET6_R), (0, FILLET6_R), align=None)
    fillet6_2_piece_1 = extrude(amount=FILLET6_R, mode=Mode.PRIVATE)
    fillet6_2_piece_1 = fillet6_2_piece_1 - Plane(origin=(-111.76, 200.66, 2.54), x_dir=(0.7071067811865475, 0, 0.7071067811865475), z_dir=(0, 1, 0)) * Sphere(FILLET6_R, mode=Mode.PRIVATE)
    add(fillet6_2_piece_1, mode=Mode.SUBTRACT)
    with BuildSketch(Plane(origin=(111.76, 200.66, 2.54), x_dir=(0, 0, -1), z_dir=(0, 1, 0))) as fillet6_2_piece_2_section:
        Polygon((0, 0), (FILLET6_R, 0), (FILLET6_R, -FILLET6_R), (0, -FILLET6_R), align=None)
    fillet6_2_piece_2 = extrude(amount=FILLET6_R, mode=Mode.PRIVATE)
    fillet6_2_piece_2 = fillet6_2_piece_2 - Plane(origin=(111.76, 200.66, 2.54), x_dir=(-0.7071067811865475, 0, 0.7071067811865475), z_dir=(0, 1, 0)) * Sphere(FILLET6_R, mode=Mode.PRIVATE)
    add(fillet6_2_piece_2, mode=Mode.SUBTRACT)
    with BuildSketch(Plane(origin=(111.76, 203.2, 0), x_dir=(0, 0, 1), z_dir=(-1, 0, 0))) as fillet6_2_piece_3:
        with BuildLine():
            CenterArc((FILLET6_R, -FILLET6_R), FILLET6_R, 90, 90)
            Line((0, -FILLET6_R), (0, 0))
            Line((0, 0), (FILLET6_R, 0))
        make_face()
    extrude(amount=223.52, mode=Mode.SUBTRACT)

    # Sketch11 → Cut-Extrude2 (cut)
    with BuildSketch(Plane.XZ.offset(-190.5)):
        with Locations(Location((-12.7, 6.35, 0), (0, 0, 270))):
            Circle(SKETCH11_R)
        with Locations(Location((12.7, 6.35, 0), (0, 0, 90))):
            Circle(SKETCH11_R)
    extrude(amount=-CUT_EXTRUDE2_DEPTH, mode=Mode.SUBTRACT)


solid = part.part
